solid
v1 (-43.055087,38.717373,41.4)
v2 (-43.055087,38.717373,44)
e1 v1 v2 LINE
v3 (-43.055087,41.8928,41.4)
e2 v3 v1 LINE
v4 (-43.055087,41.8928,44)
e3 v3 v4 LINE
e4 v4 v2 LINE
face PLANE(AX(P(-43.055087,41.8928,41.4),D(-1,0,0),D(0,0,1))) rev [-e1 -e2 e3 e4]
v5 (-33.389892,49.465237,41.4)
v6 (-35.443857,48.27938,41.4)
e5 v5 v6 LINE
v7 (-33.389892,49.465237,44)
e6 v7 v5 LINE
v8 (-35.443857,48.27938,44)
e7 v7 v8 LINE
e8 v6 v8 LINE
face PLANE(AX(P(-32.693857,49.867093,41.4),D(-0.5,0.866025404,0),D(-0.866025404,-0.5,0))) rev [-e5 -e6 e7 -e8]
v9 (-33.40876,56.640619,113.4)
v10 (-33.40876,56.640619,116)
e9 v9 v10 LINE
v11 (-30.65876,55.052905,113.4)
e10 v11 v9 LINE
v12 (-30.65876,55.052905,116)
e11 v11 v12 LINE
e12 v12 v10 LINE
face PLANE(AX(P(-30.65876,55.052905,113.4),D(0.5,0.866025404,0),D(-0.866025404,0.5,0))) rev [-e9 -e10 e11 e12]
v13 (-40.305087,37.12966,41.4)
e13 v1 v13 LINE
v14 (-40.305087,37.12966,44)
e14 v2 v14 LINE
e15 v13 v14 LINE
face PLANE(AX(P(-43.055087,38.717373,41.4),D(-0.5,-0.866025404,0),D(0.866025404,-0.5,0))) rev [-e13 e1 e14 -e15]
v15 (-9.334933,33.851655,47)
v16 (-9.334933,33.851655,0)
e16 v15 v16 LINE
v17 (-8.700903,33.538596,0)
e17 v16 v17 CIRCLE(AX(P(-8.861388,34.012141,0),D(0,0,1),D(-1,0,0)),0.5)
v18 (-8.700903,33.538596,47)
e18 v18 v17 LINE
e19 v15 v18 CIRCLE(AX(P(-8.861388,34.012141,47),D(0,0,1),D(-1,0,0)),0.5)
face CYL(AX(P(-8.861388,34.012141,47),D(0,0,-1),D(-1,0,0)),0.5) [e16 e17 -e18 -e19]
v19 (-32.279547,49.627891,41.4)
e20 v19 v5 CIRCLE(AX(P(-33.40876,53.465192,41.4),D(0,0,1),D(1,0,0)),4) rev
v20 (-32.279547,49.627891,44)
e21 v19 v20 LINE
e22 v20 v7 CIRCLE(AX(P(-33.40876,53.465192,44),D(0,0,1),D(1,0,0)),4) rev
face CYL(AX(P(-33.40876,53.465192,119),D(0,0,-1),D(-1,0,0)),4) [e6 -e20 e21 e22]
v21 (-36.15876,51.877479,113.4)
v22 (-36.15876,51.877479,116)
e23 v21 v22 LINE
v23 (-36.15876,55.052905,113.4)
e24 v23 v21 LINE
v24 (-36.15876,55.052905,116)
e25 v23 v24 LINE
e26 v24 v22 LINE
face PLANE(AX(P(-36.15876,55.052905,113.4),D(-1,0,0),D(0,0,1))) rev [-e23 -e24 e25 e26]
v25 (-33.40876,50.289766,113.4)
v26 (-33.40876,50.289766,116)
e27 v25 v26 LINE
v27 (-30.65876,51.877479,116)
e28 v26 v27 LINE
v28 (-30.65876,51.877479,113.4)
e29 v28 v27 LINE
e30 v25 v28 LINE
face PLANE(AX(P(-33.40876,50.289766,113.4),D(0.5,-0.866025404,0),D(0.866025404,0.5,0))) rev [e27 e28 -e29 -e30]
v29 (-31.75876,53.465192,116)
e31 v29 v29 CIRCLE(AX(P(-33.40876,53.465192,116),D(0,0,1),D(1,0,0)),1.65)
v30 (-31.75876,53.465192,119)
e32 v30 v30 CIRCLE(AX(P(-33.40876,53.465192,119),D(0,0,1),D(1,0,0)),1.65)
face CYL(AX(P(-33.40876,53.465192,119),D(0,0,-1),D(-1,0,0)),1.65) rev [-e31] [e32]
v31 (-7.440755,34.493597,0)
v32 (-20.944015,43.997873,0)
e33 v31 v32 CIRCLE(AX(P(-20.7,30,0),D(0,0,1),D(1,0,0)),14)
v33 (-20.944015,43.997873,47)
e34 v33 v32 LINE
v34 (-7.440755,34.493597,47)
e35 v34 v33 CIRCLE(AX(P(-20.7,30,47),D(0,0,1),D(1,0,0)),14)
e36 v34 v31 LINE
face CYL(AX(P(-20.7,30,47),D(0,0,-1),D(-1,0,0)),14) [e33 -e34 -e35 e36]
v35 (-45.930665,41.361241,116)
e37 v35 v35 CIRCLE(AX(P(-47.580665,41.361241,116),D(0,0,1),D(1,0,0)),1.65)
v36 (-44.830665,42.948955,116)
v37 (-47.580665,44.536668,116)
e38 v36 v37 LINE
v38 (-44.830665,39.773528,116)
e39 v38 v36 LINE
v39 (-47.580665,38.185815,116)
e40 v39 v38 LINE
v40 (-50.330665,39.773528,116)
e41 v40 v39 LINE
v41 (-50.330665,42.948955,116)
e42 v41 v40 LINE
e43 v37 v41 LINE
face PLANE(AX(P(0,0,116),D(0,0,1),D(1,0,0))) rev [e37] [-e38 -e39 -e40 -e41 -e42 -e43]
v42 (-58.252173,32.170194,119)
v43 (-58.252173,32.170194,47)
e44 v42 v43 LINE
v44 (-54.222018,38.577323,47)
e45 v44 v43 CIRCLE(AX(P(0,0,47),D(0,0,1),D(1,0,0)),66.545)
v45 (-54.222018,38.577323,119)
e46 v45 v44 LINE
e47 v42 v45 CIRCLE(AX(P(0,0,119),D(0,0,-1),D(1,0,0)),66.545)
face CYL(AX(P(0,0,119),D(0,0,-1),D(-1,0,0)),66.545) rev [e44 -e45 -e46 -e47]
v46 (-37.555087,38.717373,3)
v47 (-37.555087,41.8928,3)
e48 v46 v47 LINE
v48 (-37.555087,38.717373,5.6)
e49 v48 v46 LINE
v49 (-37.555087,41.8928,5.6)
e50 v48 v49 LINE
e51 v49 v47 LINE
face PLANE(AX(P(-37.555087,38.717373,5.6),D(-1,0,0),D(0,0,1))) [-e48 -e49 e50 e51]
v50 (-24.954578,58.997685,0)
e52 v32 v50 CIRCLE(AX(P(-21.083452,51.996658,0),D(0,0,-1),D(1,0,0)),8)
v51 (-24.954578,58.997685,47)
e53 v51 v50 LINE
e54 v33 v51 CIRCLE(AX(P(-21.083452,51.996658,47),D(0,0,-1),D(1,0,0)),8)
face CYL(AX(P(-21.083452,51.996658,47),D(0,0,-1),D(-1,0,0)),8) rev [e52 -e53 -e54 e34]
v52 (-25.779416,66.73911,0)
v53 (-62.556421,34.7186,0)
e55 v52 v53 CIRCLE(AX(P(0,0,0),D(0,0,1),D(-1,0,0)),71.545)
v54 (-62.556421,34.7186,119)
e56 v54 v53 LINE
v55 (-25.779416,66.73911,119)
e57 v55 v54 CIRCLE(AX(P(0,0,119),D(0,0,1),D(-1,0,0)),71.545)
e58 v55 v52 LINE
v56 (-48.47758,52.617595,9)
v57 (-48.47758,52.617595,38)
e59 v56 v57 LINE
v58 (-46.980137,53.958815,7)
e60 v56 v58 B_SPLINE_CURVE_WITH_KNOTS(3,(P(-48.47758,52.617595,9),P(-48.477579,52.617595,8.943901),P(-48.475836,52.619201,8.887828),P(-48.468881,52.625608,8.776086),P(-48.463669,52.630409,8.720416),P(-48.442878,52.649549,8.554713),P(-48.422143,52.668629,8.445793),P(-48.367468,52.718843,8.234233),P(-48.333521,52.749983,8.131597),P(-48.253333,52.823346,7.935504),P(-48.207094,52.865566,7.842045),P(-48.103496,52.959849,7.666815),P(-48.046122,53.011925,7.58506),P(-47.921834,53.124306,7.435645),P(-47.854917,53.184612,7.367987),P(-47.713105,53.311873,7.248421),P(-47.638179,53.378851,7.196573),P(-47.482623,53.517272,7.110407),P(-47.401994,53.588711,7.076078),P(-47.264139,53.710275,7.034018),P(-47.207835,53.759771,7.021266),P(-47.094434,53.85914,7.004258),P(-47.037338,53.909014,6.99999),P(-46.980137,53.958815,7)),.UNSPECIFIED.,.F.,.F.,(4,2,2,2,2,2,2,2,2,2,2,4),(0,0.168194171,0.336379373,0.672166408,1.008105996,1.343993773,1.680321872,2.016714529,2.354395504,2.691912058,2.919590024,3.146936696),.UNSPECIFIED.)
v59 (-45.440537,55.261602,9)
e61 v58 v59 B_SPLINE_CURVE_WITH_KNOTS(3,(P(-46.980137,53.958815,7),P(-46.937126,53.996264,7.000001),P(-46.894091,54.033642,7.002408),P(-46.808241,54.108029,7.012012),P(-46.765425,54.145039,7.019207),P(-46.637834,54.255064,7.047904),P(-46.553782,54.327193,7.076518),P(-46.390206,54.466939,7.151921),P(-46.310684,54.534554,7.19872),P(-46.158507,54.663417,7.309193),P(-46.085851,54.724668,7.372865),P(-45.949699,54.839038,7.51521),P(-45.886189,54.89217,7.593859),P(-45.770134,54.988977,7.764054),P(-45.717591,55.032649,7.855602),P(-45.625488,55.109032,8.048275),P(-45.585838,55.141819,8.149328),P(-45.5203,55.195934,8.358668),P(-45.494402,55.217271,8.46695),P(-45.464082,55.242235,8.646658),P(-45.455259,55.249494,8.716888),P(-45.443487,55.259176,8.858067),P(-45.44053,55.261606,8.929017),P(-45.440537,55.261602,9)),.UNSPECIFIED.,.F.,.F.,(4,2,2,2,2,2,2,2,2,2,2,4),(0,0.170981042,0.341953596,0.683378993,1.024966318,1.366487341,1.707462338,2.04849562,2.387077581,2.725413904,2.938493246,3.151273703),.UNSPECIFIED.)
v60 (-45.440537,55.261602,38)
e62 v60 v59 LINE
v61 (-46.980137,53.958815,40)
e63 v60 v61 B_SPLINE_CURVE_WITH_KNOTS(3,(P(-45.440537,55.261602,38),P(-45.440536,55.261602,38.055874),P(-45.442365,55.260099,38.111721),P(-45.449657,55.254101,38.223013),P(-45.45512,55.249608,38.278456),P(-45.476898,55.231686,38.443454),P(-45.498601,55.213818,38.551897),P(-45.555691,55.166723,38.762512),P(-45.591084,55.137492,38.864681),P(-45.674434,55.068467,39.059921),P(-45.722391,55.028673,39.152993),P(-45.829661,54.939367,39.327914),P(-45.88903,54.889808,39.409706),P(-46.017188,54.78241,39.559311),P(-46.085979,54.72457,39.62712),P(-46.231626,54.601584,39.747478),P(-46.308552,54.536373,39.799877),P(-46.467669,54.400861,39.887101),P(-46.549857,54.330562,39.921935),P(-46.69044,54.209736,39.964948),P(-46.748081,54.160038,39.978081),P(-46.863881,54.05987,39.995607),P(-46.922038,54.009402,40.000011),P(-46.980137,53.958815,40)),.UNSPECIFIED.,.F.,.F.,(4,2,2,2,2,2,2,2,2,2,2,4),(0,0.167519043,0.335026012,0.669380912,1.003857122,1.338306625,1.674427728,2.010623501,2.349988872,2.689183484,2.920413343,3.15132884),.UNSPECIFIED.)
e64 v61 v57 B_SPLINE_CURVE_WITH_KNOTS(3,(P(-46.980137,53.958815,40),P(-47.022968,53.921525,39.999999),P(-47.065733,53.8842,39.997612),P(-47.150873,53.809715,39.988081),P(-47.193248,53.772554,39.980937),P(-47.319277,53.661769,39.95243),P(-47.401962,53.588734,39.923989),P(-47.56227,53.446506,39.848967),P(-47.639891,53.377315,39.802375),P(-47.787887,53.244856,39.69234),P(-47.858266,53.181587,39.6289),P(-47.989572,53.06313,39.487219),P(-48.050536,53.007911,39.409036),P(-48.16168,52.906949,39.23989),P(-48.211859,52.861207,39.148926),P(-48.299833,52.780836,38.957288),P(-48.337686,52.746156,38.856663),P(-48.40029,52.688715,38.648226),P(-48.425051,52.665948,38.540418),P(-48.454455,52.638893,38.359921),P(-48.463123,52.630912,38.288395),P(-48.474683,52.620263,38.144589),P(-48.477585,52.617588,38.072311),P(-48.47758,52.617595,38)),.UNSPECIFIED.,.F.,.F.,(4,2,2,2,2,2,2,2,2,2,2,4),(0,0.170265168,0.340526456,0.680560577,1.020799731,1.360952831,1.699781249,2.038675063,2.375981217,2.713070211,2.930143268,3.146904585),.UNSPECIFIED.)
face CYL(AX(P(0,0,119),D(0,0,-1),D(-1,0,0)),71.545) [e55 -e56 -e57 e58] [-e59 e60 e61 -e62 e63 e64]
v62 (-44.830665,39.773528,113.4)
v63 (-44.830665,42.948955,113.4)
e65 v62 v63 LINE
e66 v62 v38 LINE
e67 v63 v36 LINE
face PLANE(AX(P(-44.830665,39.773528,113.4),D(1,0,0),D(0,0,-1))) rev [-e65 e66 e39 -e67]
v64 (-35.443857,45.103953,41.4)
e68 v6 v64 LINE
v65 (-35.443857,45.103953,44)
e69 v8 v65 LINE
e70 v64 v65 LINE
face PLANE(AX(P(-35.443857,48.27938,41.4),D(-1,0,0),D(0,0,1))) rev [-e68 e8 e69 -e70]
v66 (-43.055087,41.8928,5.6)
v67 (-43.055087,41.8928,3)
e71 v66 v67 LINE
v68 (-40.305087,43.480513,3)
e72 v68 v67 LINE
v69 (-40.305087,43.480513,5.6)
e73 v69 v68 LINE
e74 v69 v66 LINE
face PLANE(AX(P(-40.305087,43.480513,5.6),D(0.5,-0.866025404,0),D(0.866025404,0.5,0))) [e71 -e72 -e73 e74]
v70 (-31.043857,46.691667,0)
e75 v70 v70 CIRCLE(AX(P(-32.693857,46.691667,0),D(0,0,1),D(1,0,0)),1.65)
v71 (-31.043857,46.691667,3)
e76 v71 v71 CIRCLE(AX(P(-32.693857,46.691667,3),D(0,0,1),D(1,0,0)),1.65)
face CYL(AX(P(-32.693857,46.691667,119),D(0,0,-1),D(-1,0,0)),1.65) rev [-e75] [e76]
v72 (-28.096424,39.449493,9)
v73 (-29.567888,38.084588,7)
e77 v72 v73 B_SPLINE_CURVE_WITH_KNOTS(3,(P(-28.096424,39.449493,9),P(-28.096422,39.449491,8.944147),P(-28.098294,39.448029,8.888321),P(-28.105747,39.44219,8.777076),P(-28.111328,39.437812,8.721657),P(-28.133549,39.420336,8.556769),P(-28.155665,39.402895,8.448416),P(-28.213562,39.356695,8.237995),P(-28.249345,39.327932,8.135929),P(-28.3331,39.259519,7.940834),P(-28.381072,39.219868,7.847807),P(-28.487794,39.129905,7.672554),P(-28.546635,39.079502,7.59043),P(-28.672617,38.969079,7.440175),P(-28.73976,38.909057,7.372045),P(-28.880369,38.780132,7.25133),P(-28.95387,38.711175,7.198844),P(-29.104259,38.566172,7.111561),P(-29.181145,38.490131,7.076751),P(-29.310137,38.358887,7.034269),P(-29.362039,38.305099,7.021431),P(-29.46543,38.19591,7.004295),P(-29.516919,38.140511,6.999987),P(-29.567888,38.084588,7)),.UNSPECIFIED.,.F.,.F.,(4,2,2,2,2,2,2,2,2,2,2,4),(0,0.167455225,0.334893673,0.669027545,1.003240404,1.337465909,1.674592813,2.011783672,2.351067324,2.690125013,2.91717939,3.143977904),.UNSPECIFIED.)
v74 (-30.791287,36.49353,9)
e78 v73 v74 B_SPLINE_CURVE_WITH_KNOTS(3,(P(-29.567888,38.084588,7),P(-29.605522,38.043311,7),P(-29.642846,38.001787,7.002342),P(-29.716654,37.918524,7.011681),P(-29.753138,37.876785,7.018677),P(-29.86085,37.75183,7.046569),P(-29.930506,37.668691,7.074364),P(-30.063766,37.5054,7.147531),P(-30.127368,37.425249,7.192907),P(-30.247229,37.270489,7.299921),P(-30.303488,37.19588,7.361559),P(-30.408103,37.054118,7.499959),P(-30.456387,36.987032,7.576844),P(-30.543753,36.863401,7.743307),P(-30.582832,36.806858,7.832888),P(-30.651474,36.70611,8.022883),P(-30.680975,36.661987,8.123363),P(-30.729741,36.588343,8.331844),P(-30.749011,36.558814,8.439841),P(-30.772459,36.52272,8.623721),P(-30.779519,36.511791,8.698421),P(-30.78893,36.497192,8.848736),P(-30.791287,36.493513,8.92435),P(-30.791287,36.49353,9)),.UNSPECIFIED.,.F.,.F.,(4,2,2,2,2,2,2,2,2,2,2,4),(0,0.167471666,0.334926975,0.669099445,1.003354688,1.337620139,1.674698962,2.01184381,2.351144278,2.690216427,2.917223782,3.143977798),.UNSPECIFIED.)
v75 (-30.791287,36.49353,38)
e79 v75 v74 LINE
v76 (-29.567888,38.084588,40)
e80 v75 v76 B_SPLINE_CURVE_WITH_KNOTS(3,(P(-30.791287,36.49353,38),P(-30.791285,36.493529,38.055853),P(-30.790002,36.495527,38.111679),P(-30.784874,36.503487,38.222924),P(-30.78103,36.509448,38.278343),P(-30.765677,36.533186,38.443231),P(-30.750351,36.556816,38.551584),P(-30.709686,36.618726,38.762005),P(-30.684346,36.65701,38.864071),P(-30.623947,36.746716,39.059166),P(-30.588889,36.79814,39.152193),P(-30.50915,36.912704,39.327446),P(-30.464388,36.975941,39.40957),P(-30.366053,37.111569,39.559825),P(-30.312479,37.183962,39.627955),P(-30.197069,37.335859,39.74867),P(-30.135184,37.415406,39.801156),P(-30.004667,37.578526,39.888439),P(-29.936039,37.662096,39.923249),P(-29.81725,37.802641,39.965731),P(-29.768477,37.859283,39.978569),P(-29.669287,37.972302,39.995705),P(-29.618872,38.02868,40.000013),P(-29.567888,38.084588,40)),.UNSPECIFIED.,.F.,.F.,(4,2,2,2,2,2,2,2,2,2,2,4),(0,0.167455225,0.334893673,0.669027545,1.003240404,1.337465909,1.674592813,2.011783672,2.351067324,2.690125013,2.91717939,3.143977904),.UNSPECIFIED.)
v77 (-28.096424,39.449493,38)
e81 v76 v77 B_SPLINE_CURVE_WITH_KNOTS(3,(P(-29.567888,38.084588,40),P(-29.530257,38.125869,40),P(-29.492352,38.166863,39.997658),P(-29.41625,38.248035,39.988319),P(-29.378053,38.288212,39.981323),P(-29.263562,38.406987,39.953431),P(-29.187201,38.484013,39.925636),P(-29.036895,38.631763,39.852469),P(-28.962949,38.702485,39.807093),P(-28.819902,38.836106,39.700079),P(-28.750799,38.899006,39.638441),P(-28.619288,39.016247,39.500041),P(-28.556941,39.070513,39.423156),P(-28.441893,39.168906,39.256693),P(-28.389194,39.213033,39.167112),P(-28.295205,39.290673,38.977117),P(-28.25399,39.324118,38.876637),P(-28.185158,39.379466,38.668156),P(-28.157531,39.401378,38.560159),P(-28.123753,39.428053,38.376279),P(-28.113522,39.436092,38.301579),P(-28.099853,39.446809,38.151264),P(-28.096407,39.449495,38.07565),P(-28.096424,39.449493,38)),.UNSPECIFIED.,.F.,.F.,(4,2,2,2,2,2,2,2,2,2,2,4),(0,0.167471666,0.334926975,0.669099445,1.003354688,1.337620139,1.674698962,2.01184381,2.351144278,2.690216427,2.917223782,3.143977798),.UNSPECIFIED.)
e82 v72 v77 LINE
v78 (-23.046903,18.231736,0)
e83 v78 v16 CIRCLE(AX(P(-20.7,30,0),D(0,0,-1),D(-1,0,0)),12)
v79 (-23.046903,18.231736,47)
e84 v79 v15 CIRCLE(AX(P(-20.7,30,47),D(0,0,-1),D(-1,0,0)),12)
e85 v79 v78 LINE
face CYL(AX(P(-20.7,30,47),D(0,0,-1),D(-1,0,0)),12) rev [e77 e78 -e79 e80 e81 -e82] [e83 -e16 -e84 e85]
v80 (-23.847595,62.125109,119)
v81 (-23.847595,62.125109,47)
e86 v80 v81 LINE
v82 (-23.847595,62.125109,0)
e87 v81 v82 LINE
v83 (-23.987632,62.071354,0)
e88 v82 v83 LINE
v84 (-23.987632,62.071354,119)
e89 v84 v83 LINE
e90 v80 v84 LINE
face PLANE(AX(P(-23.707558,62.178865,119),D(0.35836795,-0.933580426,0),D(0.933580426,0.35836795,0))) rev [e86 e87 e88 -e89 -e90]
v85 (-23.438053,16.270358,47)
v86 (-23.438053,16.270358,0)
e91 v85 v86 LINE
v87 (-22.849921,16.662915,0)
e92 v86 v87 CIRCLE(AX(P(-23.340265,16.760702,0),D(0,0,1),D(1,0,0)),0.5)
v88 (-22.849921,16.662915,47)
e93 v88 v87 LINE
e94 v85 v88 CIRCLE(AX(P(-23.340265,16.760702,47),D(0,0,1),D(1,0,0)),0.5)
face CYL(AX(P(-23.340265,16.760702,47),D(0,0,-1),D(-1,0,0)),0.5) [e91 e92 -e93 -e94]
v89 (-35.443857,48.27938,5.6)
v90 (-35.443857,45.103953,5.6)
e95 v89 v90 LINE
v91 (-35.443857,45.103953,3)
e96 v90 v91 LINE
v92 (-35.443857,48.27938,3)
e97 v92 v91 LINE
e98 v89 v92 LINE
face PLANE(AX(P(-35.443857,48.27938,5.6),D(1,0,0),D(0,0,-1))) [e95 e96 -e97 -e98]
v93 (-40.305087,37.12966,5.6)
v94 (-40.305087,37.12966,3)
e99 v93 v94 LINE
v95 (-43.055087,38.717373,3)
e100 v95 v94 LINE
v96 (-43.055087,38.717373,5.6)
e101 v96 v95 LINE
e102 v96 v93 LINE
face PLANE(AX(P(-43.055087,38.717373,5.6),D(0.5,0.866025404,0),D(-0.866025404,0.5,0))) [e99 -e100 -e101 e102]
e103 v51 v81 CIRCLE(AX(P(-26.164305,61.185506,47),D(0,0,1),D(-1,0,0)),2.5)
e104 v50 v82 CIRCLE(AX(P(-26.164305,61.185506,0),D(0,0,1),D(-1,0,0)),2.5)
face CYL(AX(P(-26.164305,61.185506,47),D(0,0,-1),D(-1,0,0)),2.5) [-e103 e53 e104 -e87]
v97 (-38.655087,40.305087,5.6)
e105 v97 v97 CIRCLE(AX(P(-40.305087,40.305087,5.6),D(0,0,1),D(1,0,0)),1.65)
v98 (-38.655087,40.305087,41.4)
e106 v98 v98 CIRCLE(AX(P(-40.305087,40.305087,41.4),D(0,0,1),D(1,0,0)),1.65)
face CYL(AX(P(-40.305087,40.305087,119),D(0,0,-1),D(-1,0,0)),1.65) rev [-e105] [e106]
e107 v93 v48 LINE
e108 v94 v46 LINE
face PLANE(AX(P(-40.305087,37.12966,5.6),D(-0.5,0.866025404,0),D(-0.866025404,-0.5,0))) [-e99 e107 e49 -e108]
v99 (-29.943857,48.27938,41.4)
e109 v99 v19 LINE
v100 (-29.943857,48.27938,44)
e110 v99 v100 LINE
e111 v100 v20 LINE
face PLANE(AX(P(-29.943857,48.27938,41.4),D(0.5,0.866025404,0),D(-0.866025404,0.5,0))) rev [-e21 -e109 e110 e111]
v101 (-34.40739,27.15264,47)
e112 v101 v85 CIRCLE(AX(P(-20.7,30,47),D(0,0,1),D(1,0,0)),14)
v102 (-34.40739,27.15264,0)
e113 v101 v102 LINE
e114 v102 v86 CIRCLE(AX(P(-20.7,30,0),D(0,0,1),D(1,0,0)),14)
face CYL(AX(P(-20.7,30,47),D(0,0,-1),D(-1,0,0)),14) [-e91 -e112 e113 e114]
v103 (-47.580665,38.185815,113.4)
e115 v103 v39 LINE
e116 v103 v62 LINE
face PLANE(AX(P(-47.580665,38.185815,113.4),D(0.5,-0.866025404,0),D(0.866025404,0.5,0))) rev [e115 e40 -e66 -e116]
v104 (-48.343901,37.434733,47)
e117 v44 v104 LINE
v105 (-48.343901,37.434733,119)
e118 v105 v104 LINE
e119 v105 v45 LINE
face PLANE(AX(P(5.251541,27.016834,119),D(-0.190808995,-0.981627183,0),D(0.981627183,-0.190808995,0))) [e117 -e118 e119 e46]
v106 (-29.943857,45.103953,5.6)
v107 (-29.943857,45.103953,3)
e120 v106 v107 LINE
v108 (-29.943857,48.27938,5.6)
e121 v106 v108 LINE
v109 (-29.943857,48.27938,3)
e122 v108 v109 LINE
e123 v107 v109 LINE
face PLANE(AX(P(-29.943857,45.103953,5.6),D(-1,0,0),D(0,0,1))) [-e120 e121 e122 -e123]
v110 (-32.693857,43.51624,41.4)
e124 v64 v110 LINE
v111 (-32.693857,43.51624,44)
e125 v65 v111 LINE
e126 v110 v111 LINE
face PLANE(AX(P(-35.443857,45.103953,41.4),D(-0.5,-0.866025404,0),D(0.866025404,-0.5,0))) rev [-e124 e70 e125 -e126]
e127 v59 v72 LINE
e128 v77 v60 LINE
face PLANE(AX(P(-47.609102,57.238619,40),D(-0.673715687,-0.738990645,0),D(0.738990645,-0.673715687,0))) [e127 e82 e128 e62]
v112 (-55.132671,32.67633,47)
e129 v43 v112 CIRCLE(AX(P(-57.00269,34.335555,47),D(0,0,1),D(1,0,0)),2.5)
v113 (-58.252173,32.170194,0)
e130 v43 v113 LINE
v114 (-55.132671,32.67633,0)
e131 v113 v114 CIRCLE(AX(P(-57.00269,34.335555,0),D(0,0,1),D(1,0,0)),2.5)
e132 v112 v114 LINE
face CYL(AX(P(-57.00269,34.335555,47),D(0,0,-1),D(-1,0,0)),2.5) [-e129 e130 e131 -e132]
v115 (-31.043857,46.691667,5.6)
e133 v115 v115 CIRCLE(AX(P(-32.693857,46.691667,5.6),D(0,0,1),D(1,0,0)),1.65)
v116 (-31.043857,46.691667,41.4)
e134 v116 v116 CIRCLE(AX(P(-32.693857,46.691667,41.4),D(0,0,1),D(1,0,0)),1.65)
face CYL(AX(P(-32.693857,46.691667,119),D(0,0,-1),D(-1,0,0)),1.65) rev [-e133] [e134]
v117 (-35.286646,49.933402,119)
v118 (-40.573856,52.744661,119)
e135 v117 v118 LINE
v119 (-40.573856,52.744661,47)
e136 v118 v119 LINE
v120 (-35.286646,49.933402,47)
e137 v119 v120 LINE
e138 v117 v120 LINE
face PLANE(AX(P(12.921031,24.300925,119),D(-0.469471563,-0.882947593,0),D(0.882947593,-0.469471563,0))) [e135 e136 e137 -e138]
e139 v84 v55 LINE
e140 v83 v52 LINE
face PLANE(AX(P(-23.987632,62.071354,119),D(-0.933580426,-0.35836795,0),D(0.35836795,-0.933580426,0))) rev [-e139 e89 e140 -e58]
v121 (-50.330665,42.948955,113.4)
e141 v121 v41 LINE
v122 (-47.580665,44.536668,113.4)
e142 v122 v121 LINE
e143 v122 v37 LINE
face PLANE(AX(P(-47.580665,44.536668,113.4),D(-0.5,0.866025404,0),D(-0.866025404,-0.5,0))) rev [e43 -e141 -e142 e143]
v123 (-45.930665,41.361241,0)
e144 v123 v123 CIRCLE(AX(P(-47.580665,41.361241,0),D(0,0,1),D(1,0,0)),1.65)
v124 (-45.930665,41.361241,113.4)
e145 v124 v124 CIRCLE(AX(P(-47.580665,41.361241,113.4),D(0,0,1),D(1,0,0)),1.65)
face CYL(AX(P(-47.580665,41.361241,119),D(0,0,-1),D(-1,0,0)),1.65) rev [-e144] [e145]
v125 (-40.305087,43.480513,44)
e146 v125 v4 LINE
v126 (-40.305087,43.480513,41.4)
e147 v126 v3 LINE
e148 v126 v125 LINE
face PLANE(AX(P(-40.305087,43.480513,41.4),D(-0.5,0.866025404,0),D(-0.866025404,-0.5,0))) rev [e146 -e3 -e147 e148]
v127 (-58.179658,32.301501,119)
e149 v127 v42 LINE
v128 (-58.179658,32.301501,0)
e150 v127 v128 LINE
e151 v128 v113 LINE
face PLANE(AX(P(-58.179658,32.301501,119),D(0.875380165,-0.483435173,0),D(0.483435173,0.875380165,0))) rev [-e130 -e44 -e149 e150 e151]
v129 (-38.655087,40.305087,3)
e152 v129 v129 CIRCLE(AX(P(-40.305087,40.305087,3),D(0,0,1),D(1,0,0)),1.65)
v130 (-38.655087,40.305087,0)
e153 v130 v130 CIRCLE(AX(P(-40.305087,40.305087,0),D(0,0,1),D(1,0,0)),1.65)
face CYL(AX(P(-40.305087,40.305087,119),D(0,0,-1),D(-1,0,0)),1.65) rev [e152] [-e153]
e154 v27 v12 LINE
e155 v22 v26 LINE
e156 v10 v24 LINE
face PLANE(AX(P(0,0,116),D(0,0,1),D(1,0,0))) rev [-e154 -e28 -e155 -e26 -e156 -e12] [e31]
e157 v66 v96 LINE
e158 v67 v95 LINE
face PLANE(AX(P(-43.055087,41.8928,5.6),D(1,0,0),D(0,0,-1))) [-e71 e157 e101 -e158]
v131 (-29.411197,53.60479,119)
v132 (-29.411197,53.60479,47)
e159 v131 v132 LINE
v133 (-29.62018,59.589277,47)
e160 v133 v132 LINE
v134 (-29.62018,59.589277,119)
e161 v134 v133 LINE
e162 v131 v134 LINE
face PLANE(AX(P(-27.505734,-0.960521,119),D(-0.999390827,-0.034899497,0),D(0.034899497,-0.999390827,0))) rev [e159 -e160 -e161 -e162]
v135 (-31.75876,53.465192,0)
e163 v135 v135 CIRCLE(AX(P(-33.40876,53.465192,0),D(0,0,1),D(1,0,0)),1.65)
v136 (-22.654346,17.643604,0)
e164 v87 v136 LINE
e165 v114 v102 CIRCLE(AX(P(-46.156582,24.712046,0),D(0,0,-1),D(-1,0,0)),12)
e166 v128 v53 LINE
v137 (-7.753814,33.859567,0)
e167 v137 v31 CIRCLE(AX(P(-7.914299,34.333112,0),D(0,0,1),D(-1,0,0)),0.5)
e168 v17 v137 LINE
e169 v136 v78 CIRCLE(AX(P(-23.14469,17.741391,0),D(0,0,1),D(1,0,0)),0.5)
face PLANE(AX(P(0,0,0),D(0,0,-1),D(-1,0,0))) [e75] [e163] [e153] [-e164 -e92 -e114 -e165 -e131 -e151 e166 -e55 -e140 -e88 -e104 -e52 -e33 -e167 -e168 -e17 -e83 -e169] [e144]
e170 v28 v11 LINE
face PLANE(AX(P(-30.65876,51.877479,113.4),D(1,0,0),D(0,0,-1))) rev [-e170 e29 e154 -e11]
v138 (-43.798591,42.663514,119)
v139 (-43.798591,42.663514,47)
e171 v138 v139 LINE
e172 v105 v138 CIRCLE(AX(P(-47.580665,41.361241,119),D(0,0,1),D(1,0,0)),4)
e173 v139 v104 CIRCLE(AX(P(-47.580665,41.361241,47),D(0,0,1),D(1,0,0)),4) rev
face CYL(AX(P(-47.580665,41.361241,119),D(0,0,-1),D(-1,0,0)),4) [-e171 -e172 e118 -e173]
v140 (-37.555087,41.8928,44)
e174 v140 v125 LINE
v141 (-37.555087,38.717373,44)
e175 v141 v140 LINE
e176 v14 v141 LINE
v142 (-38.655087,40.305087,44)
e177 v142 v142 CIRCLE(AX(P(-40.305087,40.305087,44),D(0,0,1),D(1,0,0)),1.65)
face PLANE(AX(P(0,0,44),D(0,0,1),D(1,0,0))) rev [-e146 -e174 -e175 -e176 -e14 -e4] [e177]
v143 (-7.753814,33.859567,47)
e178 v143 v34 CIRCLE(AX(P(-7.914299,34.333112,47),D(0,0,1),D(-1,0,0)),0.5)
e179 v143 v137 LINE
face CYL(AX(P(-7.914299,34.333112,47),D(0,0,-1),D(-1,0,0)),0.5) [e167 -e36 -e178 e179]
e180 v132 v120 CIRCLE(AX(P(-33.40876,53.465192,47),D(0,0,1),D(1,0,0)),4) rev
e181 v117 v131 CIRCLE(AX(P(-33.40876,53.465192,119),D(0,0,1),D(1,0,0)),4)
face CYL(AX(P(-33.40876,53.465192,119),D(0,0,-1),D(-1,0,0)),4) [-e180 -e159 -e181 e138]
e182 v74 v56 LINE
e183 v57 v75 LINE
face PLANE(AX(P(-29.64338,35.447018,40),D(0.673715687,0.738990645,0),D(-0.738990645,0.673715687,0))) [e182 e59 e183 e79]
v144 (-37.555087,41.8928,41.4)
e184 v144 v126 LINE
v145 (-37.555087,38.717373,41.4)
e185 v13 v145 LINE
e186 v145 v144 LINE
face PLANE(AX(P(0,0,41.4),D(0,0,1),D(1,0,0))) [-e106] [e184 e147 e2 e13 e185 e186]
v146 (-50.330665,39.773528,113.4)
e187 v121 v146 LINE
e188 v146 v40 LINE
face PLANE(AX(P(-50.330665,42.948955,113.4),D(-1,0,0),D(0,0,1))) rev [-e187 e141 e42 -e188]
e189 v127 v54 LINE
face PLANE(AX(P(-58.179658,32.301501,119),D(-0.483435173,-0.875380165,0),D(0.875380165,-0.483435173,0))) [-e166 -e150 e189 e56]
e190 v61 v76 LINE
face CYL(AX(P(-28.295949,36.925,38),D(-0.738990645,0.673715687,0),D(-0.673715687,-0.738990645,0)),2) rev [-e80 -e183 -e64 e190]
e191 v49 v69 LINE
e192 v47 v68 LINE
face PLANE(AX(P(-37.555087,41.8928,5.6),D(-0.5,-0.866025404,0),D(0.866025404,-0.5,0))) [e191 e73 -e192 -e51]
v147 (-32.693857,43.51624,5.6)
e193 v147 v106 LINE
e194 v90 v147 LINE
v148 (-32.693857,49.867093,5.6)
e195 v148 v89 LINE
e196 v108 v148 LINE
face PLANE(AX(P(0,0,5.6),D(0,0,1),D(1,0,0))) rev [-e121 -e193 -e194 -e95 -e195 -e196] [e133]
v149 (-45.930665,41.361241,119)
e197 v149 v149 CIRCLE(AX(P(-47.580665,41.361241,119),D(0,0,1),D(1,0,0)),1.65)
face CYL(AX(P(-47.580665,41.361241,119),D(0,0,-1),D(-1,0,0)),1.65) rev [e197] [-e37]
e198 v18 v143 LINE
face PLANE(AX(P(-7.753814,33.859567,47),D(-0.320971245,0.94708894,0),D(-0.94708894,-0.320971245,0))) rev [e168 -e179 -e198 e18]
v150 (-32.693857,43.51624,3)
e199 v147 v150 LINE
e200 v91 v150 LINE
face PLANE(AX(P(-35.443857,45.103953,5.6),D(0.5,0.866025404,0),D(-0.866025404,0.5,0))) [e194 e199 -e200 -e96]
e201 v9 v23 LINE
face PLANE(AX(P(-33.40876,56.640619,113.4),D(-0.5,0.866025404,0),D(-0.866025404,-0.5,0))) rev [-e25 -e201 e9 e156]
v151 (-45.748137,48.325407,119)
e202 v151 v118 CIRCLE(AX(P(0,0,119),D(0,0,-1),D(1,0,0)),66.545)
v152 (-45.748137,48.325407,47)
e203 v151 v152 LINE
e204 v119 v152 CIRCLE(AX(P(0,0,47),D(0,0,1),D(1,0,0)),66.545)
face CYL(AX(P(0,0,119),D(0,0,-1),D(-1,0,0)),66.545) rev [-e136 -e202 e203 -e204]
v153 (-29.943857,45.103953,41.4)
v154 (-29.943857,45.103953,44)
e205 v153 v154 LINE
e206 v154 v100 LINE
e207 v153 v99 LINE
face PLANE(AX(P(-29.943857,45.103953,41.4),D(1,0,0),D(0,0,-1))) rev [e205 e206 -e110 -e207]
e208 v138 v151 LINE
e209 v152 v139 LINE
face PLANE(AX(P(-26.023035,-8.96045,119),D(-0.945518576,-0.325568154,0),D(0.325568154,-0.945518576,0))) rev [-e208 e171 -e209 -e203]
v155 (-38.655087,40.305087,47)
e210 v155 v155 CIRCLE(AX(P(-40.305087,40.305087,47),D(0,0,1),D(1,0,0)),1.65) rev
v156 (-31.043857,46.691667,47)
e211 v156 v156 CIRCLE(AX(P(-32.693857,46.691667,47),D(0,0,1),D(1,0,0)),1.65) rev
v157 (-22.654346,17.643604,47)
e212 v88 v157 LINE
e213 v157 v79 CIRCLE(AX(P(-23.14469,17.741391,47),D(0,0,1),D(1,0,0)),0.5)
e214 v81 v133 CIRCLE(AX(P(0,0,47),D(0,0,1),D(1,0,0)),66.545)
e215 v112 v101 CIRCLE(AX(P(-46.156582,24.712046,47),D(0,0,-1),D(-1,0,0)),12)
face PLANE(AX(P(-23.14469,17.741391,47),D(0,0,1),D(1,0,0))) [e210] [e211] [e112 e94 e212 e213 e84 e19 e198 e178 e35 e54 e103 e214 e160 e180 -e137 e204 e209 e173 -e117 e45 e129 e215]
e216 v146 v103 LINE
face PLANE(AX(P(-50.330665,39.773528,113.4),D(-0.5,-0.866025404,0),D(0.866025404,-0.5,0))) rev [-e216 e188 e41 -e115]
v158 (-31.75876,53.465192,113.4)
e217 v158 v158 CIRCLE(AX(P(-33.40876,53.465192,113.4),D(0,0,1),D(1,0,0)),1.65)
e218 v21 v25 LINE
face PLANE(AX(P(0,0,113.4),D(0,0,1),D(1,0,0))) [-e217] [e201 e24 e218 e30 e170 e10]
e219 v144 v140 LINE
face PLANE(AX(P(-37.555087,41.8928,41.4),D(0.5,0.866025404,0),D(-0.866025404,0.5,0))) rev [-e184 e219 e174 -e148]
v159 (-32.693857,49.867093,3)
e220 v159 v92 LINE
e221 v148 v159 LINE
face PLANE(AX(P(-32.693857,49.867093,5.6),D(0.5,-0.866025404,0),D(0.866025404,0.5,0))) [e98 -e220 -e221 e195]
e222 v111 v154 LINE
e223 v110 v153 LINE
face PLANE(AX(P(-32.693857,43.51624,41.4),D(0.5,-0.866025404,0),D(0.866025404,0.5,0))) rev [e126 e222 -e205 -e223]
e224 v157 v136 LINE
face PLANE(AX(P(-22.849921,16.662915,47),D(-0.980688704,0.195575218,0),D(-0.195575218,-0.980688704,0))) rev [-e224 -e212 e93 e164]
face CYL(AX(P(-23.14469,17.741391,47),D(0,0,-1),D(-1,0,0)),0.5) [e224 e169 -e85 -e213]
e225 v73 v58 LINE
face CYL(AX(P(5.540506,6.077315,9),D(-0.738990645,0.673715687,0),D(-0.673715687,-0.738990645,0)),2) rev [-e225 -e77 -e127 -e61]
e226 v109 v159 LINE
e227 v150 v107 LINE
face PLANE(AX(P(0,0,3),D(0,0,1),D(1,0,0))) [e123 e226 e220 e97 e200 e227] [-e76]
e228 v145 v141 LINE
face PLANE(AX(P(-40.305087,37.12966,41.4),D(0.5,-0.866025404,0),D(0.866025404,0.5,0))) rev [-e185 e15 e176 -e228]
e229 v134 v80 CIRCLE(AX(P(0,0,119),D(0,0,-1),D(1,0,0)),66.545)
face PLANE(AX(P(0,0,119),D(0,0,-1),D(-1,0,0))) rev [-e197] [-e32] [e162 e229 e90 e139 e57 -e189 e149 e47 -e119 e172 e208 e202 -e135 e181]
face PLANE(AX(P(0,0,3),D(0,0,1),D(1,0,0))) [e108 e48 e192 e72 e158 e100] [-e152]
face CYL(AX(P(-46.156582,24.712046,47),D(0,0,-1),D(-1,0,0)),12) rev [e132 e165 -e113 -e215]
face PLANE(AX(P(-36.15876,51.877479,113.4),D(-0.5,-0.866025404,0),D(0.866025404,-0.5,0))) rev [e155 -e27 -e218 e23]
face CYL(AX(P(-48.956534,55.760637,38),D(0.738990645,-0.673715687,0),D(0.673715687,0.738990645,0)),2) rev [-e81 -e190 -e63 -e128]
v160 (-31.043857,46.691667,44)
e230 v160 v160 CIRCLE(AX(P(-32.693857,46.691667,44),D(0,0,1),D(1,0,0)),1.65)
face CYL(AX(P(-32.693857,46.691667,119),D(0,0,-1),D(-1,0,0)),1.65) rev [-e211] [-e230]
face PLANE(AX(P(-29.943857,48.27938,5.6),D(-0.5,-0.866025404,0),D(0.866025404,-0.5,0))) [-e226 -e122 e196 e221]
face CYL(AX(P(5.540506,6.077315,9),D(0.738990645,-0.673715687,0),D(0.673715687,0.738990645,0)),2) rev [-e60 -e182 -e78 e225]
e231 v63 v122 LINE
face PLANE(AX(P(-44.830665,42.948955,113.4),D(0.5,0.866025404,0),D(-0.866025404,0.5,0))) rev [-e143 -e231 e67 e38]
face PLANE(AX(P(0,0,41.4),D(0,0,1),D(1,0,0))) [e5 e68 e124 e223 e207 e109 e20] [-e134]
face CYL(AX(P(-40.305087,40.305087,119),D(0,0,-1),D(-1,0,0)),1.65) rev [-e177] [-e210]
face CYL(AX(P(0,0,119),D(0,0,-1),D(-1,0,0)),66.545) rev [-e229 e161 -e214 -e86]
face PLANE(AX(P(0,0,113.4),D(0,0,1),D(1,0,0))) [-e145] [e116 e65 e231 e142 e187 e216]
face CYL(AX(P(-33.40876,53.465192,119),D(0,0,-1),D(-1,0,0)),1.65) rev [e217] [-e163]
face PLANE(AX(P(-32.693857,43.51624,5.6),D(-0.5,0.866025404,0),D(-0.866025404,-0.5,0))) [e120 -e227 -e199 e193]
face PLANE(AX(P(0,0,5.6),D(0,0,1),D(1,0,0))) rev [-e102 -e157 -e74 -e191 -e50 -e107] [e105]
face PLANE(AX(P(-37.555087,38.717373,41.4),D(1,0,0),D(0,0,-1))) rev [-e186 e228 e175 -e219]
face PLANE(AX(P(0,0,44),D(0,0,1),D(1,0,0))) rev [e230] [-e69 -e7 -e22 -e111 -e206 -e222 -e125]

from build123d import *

# Parameters (mm, degrees)
BOSS_EXTRUDE1_DEPTH     = 119
BOSS_EXTRUDE2_DEPTH     = 47
SKETCH4_R               = 1.65
CUT_EXTRUDE1_DEPTH      = 151.148950374
CUT_EXTRUDE2_START      = 44
CUT_EXTRUDE2_DEPTH      = 2.6
BOSS_EXTRUDE3_DEPTH     = 119
SKETCH7_R               = 1.65
CUT_EXTRUDE3_DEPTH      = 151.148950374
CUT_EXTRUDE4_START      = 116
CUT_EXTRUDE4_DEPTH      = 2.6
CUT_EXTRUDE5_START      = 3
CUT_EXTRUDE5_DEPTH      = 2.6
CUT_EXTRUDE_THIN1_DEPTH = 151.148950374
CUT_EXTRUDE6_START      = 7
CUT_EXTRUDE6_DEPTH      = 33
FILLET1_R               = 2


with BuildPart() as part:
    # Sketch1 → Boss-Extrude1 (new body)
    with BuildSketch(Plane(origin=(0, 0, 0), x_dir=(0, 1, 0), z_dir=(0, 0, 1))):
        with BuildLine():
            Line((66.793011614, 25.63943495), (62.125109481, 23.847595202))
            ThreePointArc((62.125109481, 23.847595202), (50.18784505, 43.696878999), (32.170193606, 58.252173078))
            Line((32.170193606, 58.252173078), (34.587369472, 62.629073903))
            ThreePointArc((34.587369472, 62.629073903), (53.95881545, 46.980136869), (66.793011614, 25.63943495))
        make_face()
    extrude(amount=BOSS_EXTRUDE1_DEPTH)

    # Sketch3 → Boss-Extrude2 (add)
    with BuildSketch(Plane(origin=(0, 0, 0), x_dir=(0, 1, 0), z_dir=(0, 0, 1))):
        with BuildLine():
            Line((16.662914887, 22.849921086), (17.643603591, 22.654345869))
            ThreePointArc((17.643603591, 22.654345869), (18.018970735, 22.728818123), (18.231735551, 23.046902612))
            ThreePointArc((18.231735551, 23.046902612), (37.916609506, 29.718164665), (33.851654942, 9.334932723))
            ThreePointArc((33.851654942, 9.334932723), (33.563813587, 9.082754287), (33.538596095, 8.700902631))
            Line((33.538596095, 8.700902631), (33.85956734, 7.753813691))
            ThreePointArc((33.85956734, 7.753813691), (34.111745776, 7.465972336), (34.493597433, 7.440754844))
            ThreePointArc((34.493597433, 7.440754844), (41.448499021, 12.641968592), (43.997873295, 20.944014808))
            ThreePointArc((43.997873295, 20.944014808), (49.930251766, 28.811968202), (58.997685125, 24.954578252))
            ThreePointArc((58.997685125, 24.954578252), (60.351321071, 23.807583941), (62.125109481, 23.847595202))
            ThreePointArc((62.125109481, 23.847595202), (50.18784505, 43.696878999), (32.170193606, 58.252173078))
            ThreePointArc((32.170193606, 58.252173078), (31.867825608, 56.602303211), (32.676329677, 55.132671232))
            ThreePointArc((32.676329677, 55.132671232), (36.307290349, 43.066223982), (27.152640183, 34.407390053))
            ThreePointArc((27.152640183, 34.407390053), (20.061145201, 30.559977956), (16.270358143, 23.438053047))
            ThreePointArc((16.270358143, 23.438053047), (16.344830398, 23.062685903), (16.662914887, 22.849921086))
        make_face()
    extrude(amount=BOSS_EXTRUDE2_DEPTH)

    # Sketch4 → Cut-Extrude1 (cut, through all)
    with BuildSketch(Plane(origin=(0, 0, 0), x_dir=(0, 1, 0), z_dir=(0, 0, 1))):
        with Locations(Location((40.305086528, 40.305086528, 0), (0, 0, 270))):
            Circle(SKETCH4_R)
        with Locations(Location((46.691666524, 32.693856872, 0), (0, 0, 270))):
            Circle(SKETCH4_R)
    extrude(amount=CUT_EXTRUDE1_DEPTH, mode=Mode.SUBTRACT)

    # Sketch5 → Cut-Extrude2 (cut)
    with BuildSketch(Plane(origin=(0, 0, 0), x_dir=(0, 1, 0), z_dir=(0, 0, 1)).offset(CUT_EXTRUDE2_START)):
        Polygon((43.480513008, 40.305086528), (41.892799768, 43.055086528), (38.717373287, 43.055086528), (37.129660047, 40.305086528), (38.717373287, 37.555086528), (41.892799768, 37.555086528), align=None)
        Polygon((49.867093005, 32.693856872), (48.279379765, 35.443856872), (45.103953284, 35.443856872), (43.516240044, 32.693856872), (45.103953284, 29.943856872), (48.279379765, 29.943856872), align=None)
    extrude(amount=-CUT_EXTRUDE2_DEPTH, mode=Mode.SUBTRACT)

    # Sketch6 → Boss-Extrude3 (add)
    with BuildSketch(Plane(origin=(0, 0, 0), x_dir=(0, 1, 0), z_dir=(0, 0, 1))):
        with BuildLine():
            ThreePointArc((38.577322779, 54.222017596), (43.657448084, 50.222149016), (48.32540701, 45.748137255))
            Line((48.32540701, 45.748137255), (42.663514101, 43.798591183))
            ThreePointArc((42.663514101, 43.798591183), (38.737005367, 44.561827164), (37.434732749, 48.343901467))
            Line((37.434732749, 48.343901467), (38.577322779, 54.222017596))
        make_face()
        with BuildLine():
            ThreePointArc((52.744660964, 40.57385568), (56.433360559, 35.263477438), (59.589277435, 29.620179604))
            Line((59.589277435, 29.620179604), (53.604790209, 29.411196706))
            ThreePointArc((53.604790209, 29.411196706), (50.072999838, 31.289082957), (49.933401851, 35.286646265))
            Line((49.933401851, 35.286646265), (52.744660964, 40.57385568))
        make_face()
    extrude(amount=BOSS_EXTRUDE3_DEPTH)

    # Sketch7 → Cut-Extrude3 (cut, through all)
    with BuildSketch(Plane(origin=(0, 0, 0), x_dir=(0, 1, 0), z_dir=(0, 0, 1))):
        with Locations(Location((41.361241483, 47.580665485, 0), (0, 0, 270))):
            Circle(SKETCH7_R)
        with Locations(Location((53.465192222, 33.408760014, 0), (0, 0, 270))):
            Circle(SKETCH7_R)
    extrude(amount=CUT_EXTRUDE3_DEPTH, mode=Mode.SUBTRACT)

    # Sketch8 → Cut-Extrude4 (cut)
    with BuildSketch(Plane(origin=(0, 0, 0), x_dir=(0, 1, 0), z_dir=(0, 0, 1)).offset(CUT_EXTRUDE4_START)):
        Polygon((44.536667963, 47.580665485), (42.948954723, 50.330665485), (39.773528242, 50.330665485), (38.185815002, 47.580665485), (39.773528242, 44.830665485), (42.948954723, 44.830665485), align=None)
        Polygon((56.640618703, 33.408760014), (55.052905462, 36.158760014), (51.877478982, 36.158760014), (50.289765742, 33.408760014), (51.877478982, 30.658760014), (55.052905462, 30.658760014), align=None)
    extrude(amount=-CUT_EXTRUDE4_DEPTH, mode=Mode.SUBTRACT)

    # Sketch5<2> → Cut-Extrude5 (cut)
    with BuildSketch(Plane(origin=(0, 0, 0), x_dir=(0, 1, 0), z_dir=(0, 0, 1)).offset(CUT_EXTRUDE5_START)):
        Polygon((43.480513008, 40.305086528), (41.892799768, 43.055086528), (38.717373287, 43.055086528), (37.129660047, 40.305086528), (38.717373287, 37.555086528), (41.892799768, 37.555086528), align=None)
        Polygon((49.867093005, 32.693856872), (48.279379765, 35.443856872), (45.103953284, 35.443856872), (43.516240044, 32.693856872), (45.103953284, 29.943856872), (48.279379765, 29.943856872), align=None)
    extrude(amount=CUT_EXTRUDE5_DEPTH, mode=Mode.SUBTRACT)

    # Sketch9 → Cut-Extrude-Thin1 (cut, through all)
    with BuildSketch(Plane(origin=(0, 0, 0), x_dir=(0, 1, 0), z_dir=(0, 0, 1))):
        Polygon((62.178864674, 23.707558139), (66.846766806, 25.499397886), (66.739256421, 25.779472014), (62.071354289, 23.987632266), align=None)
        Polygon((32.301500631, 58.179657802), (34.718676497, 62.556558627), (34.456062447, 62.701589179), (32.038886581, 58.324688354), align=None)
    extrude(amount=CUT_EXTRUDE_THIN1_DEPTH, mode=Mode.SUBTRACT)

    # Sketch10 → Cut-Extrude6 (cut)
    with BuildSketch(Plane(origin=(0, 0, 0), x_dir=(0, 1, 0), z_dir=(0, 0, 1)).offset(CUT_EXTRUDE6_START)):
        Polygon((35.44701831, 29.64338025), (54.282655982, 50.303964956), (57.23861856, 47.609102207), (38.402980888, 26.948517501), align=None)
    extrude(amount=CUT_EXTRUDE6_DEPTH, mode=Mode.SUBTRACT)

    # Fillet1
    # the kernel refuses this fillet: 2 mm, written as the material it adds along each edge
    with BuildSketch(Plane(origin=(-27.096333376, 33.124951788, 40), x_dir=(0.673715687259404, 0.7389906445555241, 0), z_dir=(-0.7389906445555242, 0.673715687259404, 0))) as fillet1_piece_1_section:
        with BuildLine():
            CenterArc((FILLET1_R, FILLET1_R), FILLET1_R, 180, 90)
            Line((0, FILLET1_R), (0, 0))
            Line((0, 0), (FILLET1_R, 0))
        make_face()
    fillet1_piece_1 = extrude(amount=33.933040427, mode=Mode.PRIVATE)
    fillet1_piece_1 = fillet1_piece_1 & Plane(origin=(0, 0, 39.546220167), x_dir=(-0.8753801649783101, 0.4834351732782244, 0), z_dir=(0, 0, -1)) * Cylinder(71.545, 76, mode=Mode.PRIVATE)
    fillet1_piece_1 = fillet1_piece_1 - Plane(origin=(-20.7, 30, 39.546220167), x_dir=(-0.19557521764305516, -0.9806887040462288, 0), z_dir=(0, 0, -1)) * Cylinder(12, 76, mode=Mode.PRIVATE)
    add(fillet1_piece_1)
    with BuildSketch(Plane(origin=(-49.13548978, 58.630180498, 40), x_dir=(-0.6737156872594037, -0.7389906445555243, 0), z_dir=(0.7389906445555244, -0.6737156872594038, 0))) as fillet1_piece_2_section:
        with BuildLine():
            CenterArc((FILLET1_R, FILLET1_R), FILLET1_R, 180, 90)
            Line((0, FILLET1_R), (0, 0))
            Line((0, 0), (FILLET1_R, 0))
        make_face()
    fillet1_piece_2 = extrude(amount=33.470003085, mode=Mode.PRIVATE)
    fillet1_piece_2 = fillet1_piece_2 & Plane(origin=(0, 0, 39.547293042), x_dir=(-0.8753801649783101, 0.4834351732782244, 0), z_dir=(0, 0, -1)) * Cylinder(71.545, 75, mode=Mode.PRIVATE)
    fillet1_piece_2 = fillet1_piece_2 - Plane(origin=(-20.7, 30, 39.547293042), x_dir=(-0.19557521764305516, -0.9806887040462288, 0), z_dir=(0, 0, -1)) * Cylinder(12, 75, mode=Mode.PRIVATE)
    add(fillet1_piece_2)
    with BuildSketch(Plane(origin=(-27.096333376, 33.124951788, 7), x_dir=(0.673715687259404, 0.7389906445555241, 0), z_dir=(-0.7389906445555242, 0.673715687259404, 0))) as fillet1_piece_3_section:
        with BuildLine():
            CenterArc((FILLET1_R, -FILLET1_R), FILLET1_R, 90, 90)
            Line((0, -FILLET1_R), (0, 0))
            Line((0, 0), (FILLET1_R, 0))
        make_face()
    fillet1_piece_3 = extrude(amount=33.933040427, mode=Mode.PRIVATE)
    fillet1_piece_3 = fillet1_piece_3 & Plane(origin=(0, 0, 7.453779833), x_dir=(-0.8753801649783101, 0.4834351732782244, 0), z_dir=(0, 0, -1)) * Cylinder(71.545, 76, mode=Mode.PRIVATE)
    fillet1_piece_3 = fillet1_piece_3 - Plane(origin=(-20.7, 30, 7.453779833), x_dir=(-0.19557521764305516, -0.9806887040462288, 0), z_dir=(0, 0, -1)) * Cylinder(12, 76, mode=Mode.PRIVATE)
    add(fillet1_piece_3)
    with BuildSketch(Plane(origin=(-49.13548978, 58.630180498, 7), x_dir=(0, 0, 1), z_dir=(0.7389906445555244, -0.6737156872594038, 0))) as fillet1_piece_4_section:
        with BuildLine():
            CenterArc((FILLET1_R, FILLET1_R), FILLET1_R, 180, 90)
            Line((0, FILLET1_R), (0, 0))
            Line((0, 0), (FILLET1_R, 0))
        make_face()
    fillet1_piece_4 = extrude(amount=33.470003085, mode=Mode.PRIVATE)
    fillet1_piece_4 = fillet1_piece_4 & Plane(origin=(0, 0, 7.452710361), x_dir=(-0.8753801649783101, 0.4834351732782244, 0), z_dir=(0, 0, -1)) * Cylinder(71.545, 75, mode=Mode.PRIVATE)
    fillet1_piece_4 = fillet1_piece_4 - Plane(origin=(-20.7, 30, 7.452710361), x_dir=(-0.19557521764305516, -0.9806887040462288, 0), z_dir=(0, 0, -1)) * Cylinder(12, 75, mode=Mode.PRIVATE)
    add(fillet1_piece_4)


solid = part.part
